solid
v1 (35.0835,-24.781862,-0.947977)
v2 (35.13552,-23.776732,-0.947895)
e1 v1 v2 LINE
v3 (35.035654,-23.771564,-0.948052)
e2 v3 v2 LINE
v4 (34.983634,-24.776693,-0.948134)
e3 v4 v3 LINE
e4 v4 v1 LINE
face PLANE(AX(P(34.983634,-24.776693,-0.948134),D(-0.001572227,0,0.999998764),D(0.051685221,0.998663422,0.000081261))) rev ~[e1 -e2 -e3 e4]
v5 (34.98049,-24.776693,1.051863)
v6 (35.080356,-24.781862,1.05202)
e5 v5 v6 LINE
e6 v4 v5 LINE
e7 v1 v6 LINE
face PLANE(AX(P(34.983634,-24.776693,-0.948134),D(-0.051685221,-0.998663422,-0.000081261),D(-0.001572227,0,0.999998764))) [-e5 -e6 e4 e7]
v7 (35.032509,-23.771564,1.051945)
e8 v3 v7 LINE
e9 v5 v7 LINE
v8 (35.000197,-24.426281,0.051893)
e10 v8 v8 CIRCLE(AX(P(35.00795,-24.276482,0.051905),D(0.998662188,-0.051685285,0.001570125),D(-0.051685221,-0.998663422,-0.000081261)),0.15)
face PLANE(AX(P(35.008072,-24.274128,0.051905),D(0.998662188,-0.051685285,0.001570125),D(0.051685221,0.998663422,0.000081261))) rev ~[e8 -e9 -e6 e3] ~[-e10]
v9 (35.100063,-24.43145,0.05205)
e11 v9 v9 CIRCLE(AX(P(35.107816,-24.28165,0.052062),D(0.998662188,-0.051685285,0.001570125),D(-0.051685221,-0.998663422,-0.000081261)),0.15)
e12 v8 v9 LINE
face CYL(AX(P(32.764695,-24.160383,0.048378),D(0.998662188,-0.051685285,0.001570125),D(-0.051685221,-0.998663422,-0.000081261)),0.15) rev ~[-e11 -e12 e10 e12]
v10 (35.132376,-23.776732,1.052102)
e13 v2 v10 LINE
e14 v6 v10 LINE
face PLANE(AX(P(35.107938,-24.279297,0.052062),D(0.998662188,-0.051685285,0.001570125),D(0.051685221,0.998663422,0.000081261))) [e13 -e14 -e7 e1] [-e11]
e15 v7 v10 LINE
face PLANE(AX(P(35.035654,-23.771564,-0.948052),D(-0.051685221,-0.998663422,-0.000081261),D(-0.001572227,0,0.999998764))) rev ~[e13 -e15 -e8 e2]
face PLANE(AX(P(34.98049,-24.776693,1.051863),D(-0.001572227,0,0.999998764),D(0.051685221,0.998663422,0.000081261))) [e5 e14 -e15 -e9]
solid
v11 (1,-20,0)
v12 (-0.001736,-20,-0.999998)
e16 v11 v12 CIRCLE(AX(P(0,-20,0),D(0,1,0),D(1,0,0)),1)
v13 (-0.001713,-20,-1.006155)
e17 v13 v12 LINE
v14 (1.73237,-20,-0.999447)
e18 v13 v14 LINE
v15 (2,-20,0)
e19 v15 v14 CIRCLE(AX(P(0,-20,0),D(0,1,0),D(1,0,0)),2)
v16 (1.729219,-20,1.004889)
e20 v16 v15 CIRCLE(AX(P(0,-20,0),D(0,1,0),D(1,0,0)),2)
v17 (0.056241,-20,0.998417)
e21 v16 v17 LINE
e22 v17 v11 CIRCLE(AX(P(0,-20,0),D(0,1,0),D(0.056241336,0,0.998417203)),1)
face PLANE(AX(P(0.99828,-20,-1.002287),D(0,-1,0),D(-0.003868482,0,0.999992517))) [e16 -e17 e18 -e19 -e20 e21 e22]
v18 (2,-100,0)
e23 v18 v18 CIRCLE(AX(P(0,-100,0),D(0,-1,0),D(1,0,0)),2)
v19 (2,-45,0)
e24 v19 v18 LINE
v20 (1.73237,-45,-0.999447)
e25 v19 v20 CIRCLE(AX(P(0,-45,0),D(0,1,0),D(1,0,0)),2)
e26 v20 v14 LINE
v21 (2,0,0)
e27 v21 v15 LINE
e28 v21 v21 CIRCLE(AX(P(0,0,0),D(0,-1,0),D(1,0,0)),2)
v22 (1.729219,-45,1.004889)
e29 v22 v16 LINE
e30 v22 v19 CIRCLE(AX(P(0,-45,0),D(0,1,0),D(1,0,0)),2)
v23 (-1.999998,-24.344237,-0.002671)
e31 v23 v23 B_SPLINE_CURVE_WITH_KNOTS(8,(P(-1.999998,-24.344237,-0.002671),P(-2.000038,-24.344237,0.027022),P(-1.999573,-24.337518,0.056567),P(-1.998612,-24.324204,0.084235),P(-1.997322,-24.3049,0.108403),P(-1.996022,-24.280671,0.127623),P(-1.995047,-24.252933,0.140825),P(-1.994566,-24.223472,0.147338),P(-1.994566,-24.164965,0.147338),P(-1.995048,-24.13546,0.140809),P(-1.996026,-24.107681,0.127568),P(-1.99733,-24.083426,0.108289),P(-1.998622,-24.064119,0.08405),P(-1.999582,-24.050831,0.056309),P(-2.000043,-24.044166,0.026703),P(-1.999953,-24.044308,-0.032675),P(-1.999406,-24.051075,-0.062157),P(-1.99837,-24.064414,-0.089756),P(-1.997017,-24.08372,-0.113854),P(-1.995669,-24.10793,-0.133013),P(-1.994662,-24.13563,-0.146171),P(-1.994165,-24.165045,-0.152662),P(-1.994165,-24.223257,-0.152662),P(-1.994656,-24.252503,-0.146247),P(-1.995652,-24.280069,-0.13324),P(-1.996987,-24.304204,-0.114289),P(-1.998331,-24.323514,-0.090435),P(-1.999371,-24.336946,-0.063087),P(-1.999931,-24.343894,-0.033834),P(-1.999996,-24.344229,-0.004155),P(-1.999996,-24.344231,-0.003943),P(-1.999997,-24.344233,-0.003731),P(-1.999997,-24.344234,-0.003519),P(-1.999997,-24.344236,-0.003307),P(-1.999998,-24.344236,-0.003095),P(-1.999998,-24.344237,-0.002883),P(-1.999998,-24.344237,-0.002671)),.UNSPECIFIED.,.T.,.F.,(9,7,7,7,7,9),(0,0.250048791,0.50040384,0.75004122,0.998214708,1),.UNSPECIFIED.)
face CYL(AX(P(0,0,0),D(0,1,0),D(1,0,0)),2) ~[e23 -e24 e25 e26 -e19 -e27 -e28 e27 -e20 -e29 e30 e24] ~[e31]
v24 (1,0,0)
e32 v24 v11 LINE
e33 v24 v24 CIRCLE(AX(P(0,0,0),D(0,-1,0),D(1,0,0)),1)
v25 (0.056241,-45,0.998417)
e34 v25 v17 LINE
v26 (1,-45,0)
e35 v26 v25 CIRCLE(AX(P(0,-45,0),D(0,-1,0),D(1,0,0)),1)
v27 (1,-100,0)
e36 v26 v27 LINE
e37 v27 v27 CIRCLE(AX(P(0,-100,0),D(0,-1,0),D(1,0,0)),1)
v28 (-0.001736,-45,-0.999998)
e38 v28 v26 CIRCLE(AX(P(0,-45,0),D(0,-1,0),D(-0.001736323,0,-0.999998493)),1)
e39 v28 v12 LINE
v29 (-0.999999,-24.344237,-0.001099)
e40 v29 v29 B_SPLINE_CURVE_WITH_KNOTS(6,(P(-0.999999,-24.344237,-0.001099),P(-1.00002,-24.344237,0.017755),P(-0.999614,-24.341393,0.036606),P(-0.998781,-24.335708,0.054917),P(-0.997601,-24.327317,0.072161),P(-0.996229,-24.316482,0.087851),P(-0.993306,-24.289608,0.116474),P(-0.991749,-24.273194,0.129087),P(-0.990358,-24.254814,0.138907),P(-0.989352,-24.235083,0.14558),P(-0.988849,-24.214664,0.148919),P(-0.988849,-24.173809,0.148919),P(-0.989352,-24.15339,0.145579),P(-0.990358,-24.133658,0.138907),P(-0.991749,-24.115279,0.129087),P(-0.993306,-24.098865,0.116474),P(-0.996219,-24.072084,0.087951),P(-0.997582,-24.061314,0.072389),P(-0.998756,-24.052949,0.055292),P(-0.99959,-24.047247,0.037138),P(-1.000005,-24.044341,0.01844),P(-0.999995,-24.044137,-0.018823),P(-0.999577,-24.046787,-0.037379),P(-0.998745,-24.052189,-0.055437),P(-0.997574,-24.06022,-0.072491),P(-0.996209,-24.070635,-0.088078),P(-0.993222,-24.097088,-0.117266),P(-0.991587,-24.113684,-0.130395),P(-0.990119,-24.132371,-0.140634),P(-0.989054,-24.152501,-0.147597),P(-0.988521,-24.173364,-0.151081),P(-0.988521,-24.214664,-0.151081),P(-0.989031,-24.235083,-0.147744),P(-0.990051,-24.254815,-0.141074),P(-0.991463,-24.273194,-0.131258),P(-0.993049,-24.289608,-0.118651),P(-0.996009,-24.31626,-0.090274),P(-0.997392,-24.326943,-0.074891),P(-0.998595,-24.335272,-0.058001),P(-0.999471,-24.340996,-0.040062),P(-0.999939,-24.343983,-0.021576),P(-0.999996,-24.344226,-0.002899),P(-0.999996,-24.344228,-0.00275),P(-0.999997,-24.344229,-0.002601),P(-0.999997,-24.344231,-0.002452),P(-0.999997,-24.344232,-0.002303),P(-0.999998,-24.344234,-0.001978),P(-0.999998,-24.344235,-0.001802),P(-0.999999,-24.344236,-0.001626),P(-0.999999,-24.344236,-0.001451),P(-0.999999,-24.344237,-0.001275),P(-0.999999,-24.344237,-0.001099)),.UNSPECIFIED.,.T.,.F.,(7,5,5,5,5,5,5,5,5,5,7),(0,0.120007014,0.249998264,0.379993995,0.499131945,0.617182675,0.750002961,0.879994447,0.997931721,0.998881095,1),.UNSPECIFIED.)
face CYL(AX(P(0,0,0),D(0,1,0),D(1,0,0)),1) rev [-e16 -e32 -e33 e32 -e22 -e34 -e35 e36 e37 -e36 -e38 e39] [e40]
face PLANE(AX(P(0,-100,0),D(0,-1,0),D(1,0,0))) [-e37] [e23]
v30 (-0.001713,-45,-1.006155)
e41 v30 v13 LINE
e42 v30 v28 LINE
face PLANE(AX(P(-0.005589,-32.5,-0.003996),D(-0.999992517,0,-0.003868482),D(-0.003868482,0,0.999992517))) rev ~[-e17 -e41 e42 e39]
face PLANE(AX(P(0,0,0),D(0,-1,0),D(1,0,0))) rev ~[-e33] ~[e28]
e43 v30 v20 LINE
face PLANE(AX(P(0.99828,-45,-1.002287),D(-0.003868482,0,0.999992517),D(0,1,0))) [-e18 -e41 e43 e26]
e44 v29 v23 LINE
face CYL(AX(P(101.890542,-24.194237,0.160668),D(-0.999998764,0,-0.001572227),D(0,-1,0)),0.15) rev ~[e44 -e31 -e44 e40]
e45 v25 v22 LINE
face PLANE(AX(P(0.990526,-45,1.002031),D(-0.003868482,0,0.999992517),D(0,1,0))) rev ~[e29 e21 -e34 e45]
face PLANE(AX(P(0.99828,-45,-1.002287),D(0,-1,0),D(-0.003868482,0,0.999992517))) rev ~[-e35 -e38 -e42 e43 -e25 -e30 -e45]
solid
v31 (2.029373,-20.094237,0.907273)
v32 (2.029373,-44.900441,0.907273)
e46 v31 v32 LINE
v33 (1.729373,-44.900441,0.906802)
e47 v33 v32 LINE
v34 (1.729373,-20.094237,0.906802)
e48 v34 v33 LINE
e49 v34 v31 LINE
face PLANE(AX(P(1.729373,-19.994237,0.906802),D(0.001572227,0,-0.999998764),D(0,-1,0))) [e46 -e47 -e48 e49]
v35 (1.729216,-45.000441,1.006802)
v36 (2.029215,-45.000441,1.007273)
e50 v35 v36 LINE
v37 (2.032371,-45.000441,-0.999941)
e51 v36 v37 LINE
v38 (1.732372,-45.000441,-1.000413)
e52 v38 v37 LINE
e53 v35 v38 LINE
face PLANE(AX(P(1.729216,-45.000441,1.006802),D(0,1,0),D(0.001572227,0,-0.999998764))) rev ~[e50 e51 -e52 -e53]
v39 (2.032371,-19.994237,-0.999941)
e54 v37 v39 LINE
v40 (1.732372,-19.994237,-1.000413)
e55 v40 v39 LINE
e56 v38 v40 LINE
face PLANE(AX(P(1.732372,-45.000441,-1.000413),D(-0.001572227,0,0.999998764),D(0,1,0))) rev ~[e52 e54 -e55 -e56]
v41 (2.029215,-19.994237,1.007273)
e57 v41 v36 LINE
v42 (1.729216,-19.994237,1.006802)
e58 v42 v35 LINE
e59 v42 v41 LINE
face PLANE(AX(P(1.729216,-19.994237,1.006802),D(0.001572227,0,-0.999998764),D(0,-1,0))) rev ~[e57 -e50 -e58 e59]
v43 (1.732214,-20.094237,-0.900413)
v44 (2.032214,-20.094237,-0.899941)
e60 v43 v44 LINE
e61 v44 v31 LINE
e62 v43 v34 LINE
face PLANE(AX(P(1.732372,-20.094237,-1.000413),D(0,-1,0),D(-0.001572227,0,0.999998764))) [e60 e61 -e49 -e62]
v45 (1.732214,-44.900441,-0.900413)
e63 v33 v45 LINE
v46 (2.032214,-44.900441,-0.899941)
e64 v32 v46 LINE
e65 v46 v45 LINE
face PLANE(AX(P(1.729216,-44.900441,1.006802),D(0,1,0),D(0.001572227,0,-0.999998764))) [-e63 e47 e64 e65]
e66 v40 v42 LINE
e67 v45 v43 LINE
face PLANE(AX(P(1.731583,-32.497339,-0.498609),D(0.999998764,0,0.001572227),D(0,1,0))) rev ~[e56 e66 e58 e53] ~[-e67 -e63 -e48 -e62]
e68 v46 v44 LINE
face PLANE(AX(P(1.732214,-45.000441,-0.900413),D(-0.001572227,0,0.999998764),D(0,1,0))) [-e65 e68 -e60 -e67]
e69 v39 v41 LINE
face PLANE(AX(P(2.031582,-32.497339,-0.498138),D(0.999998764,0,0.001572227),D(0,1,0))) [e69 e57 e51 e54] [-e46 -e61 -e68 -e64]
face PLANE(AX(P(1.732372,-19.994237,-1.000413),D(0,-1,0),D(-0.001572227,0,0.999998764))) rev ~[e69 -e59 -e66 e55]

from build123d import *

# Parameters (mm, degrees)
F0_R          = 2
F0_R_2        = 1
F1_DEPTH      = 100
F5_E5_W       = 2.0043330533
F5_E5_H       = 25
F6_DEPTH      = 25
F6_DEPTH_BACK = 1
F9_DEPTH      = 0.3
F10_T         = -0.1
F14_W         = 1.0064751207
F14_H         = 2
F15_DEPTH     = 0.1
F16_D         = 0.3
F17_D         = 0.3


# Not quite as in the source:
# - a feature of the source that left no trace in its solid (it failed there, or was rolled back) is left out


with BuildPart() as f1:
    # F0 (on Front) → F1 (new body)
    with BuildSketch(Plane.XZ):
        Circle(F0_R)
        Circle(F0_R_2, mode=Mode.SUBTRACT)
    extrude(amount=F1_DEPTH)

    # F5_E5 (on explicit) → F6 (cut, two sides)
    with BuildSketch(Plane(origin=(0.9982800111, -45, -1.0022865608), x_dir=(-0.0038684819, 0, 0.9999925174), z_dir=(-0.9999925174, 0, -0.0038684819))) as f6_sk:
        with Locations((1.0021665267, 12.5)):
            Rectangle(F5_E5_W, F5_E5_H)
    extrude(amount=-F6_DEPTH, mode=Mode.SUBTRACT)
    extrude(f6_sk.sketch, amount=F6_DEPTH_BACK, mode=Mode.SUBTRACT)

    # F17 (through all)
    with Locations(Plane(origin=(1.7307944858, 0, 0.0027212049), x_dir=(0, 1, 0), z_dir=(0.9999987641, 0, 0.0015722268))):
        with Locations((-24.1942365289, 0.0004732283)):
            Hole(F17_D / 2)


with BuildPart() as f9:
    # F8 (on face) → F9 (new body)
    with BuildSketch(Plane(origin=(1.7307944858, 0, 0.0027212049), x_dir=(0, 1, 0), z_dir=(0.9999987641, 0, 0.0015722268))):
        Polygon((-45.0004413724, -1.0031352285), (-19.9942365289, -1.0031352285), (-19.9942365289, 0.0004732283), (-24.1942365289, 0.0004732283), (-41.1659032106, 0.0004732283), (-45.0004413724, 0.0004732283), align=None)
        Polygon((-24.1942365289, 0.0004732283), (-19.9942365289, 0.0004732283), (-19.9942365289, 1.0040816851), (-45.0004413724, 1.0040816851), (-45.0004413724, 0.0004732283), (-41.1659032106, 0.0004732283), align=None)
    extrude(amount=F9_DEPTH)

    # F10
    f10_openings = [f9.faces().sort_by_distance(p)[0] for p in [
        (2.030793, -32.497339, 0.003666),
        (1.730794, -32.497339, 0.003194),
    ]]
    offset(amount=F10_T, openings=f10_openings)


with BuildPart() as f15:
    # F14 (on face) → F15 (new body)
    with BuildSketch(Plane(origin=(36.1674841996, -1.8718308958, 0.056863559), x_dir=(0.0516852214, 0.9986634224, 8.1261e-05), z_dir=(0.9986621881, -0.0516852853, 0.0015701254))):
        with Locations((-22.4322800759, -0.0031352285)):
            Rectangle(F14_W, F14_H)
        Polygon((-22.8325207636, -0.9031352285), (-22.8325207636, 0.8968647715), (-22.4346363536, 0.8968647715), (-22.0367519436, 0.8968647715), (-22.0367519436, -0.9031352285), (-22.4346363536, -0.9031352285), align=None, mode=Mode.SUBTRACT)
        Polygon((-22.4346363536, 0.8968647715), (-22.8325207636, 0.8968647715), (-22.8325207636, -0.9031352285), (-22.4346363536, -0.9031352285), (-22.4346363536, -0.0031352285), align=None)
        Polygon((-22.0367519436, 0.8968647715), (-22.4346363536, 0.8968647715), (-22.4346363536, -0.0031352285), (-22.4346363536, -0.9031352285), (-22.0367519436, -0.9031352285), align=None)
    extrude(amount=F15_DEPTH)

    # F16 (through all)
    with Locations(Plane(origin=(36.1674841996, -1.8718308958, 0.056863559), x_dir=(0.0516852214, 0.9986634224, 8.1261e-05), z_dir=(-0.9986621881, 0.0516852853, -0.0015701254))):
        with Locations((-22.4346363536, 0.0031352285)):
            Hole(F16_D / 2)


solid = Compound([f1.part, f9.part, f15.part])
